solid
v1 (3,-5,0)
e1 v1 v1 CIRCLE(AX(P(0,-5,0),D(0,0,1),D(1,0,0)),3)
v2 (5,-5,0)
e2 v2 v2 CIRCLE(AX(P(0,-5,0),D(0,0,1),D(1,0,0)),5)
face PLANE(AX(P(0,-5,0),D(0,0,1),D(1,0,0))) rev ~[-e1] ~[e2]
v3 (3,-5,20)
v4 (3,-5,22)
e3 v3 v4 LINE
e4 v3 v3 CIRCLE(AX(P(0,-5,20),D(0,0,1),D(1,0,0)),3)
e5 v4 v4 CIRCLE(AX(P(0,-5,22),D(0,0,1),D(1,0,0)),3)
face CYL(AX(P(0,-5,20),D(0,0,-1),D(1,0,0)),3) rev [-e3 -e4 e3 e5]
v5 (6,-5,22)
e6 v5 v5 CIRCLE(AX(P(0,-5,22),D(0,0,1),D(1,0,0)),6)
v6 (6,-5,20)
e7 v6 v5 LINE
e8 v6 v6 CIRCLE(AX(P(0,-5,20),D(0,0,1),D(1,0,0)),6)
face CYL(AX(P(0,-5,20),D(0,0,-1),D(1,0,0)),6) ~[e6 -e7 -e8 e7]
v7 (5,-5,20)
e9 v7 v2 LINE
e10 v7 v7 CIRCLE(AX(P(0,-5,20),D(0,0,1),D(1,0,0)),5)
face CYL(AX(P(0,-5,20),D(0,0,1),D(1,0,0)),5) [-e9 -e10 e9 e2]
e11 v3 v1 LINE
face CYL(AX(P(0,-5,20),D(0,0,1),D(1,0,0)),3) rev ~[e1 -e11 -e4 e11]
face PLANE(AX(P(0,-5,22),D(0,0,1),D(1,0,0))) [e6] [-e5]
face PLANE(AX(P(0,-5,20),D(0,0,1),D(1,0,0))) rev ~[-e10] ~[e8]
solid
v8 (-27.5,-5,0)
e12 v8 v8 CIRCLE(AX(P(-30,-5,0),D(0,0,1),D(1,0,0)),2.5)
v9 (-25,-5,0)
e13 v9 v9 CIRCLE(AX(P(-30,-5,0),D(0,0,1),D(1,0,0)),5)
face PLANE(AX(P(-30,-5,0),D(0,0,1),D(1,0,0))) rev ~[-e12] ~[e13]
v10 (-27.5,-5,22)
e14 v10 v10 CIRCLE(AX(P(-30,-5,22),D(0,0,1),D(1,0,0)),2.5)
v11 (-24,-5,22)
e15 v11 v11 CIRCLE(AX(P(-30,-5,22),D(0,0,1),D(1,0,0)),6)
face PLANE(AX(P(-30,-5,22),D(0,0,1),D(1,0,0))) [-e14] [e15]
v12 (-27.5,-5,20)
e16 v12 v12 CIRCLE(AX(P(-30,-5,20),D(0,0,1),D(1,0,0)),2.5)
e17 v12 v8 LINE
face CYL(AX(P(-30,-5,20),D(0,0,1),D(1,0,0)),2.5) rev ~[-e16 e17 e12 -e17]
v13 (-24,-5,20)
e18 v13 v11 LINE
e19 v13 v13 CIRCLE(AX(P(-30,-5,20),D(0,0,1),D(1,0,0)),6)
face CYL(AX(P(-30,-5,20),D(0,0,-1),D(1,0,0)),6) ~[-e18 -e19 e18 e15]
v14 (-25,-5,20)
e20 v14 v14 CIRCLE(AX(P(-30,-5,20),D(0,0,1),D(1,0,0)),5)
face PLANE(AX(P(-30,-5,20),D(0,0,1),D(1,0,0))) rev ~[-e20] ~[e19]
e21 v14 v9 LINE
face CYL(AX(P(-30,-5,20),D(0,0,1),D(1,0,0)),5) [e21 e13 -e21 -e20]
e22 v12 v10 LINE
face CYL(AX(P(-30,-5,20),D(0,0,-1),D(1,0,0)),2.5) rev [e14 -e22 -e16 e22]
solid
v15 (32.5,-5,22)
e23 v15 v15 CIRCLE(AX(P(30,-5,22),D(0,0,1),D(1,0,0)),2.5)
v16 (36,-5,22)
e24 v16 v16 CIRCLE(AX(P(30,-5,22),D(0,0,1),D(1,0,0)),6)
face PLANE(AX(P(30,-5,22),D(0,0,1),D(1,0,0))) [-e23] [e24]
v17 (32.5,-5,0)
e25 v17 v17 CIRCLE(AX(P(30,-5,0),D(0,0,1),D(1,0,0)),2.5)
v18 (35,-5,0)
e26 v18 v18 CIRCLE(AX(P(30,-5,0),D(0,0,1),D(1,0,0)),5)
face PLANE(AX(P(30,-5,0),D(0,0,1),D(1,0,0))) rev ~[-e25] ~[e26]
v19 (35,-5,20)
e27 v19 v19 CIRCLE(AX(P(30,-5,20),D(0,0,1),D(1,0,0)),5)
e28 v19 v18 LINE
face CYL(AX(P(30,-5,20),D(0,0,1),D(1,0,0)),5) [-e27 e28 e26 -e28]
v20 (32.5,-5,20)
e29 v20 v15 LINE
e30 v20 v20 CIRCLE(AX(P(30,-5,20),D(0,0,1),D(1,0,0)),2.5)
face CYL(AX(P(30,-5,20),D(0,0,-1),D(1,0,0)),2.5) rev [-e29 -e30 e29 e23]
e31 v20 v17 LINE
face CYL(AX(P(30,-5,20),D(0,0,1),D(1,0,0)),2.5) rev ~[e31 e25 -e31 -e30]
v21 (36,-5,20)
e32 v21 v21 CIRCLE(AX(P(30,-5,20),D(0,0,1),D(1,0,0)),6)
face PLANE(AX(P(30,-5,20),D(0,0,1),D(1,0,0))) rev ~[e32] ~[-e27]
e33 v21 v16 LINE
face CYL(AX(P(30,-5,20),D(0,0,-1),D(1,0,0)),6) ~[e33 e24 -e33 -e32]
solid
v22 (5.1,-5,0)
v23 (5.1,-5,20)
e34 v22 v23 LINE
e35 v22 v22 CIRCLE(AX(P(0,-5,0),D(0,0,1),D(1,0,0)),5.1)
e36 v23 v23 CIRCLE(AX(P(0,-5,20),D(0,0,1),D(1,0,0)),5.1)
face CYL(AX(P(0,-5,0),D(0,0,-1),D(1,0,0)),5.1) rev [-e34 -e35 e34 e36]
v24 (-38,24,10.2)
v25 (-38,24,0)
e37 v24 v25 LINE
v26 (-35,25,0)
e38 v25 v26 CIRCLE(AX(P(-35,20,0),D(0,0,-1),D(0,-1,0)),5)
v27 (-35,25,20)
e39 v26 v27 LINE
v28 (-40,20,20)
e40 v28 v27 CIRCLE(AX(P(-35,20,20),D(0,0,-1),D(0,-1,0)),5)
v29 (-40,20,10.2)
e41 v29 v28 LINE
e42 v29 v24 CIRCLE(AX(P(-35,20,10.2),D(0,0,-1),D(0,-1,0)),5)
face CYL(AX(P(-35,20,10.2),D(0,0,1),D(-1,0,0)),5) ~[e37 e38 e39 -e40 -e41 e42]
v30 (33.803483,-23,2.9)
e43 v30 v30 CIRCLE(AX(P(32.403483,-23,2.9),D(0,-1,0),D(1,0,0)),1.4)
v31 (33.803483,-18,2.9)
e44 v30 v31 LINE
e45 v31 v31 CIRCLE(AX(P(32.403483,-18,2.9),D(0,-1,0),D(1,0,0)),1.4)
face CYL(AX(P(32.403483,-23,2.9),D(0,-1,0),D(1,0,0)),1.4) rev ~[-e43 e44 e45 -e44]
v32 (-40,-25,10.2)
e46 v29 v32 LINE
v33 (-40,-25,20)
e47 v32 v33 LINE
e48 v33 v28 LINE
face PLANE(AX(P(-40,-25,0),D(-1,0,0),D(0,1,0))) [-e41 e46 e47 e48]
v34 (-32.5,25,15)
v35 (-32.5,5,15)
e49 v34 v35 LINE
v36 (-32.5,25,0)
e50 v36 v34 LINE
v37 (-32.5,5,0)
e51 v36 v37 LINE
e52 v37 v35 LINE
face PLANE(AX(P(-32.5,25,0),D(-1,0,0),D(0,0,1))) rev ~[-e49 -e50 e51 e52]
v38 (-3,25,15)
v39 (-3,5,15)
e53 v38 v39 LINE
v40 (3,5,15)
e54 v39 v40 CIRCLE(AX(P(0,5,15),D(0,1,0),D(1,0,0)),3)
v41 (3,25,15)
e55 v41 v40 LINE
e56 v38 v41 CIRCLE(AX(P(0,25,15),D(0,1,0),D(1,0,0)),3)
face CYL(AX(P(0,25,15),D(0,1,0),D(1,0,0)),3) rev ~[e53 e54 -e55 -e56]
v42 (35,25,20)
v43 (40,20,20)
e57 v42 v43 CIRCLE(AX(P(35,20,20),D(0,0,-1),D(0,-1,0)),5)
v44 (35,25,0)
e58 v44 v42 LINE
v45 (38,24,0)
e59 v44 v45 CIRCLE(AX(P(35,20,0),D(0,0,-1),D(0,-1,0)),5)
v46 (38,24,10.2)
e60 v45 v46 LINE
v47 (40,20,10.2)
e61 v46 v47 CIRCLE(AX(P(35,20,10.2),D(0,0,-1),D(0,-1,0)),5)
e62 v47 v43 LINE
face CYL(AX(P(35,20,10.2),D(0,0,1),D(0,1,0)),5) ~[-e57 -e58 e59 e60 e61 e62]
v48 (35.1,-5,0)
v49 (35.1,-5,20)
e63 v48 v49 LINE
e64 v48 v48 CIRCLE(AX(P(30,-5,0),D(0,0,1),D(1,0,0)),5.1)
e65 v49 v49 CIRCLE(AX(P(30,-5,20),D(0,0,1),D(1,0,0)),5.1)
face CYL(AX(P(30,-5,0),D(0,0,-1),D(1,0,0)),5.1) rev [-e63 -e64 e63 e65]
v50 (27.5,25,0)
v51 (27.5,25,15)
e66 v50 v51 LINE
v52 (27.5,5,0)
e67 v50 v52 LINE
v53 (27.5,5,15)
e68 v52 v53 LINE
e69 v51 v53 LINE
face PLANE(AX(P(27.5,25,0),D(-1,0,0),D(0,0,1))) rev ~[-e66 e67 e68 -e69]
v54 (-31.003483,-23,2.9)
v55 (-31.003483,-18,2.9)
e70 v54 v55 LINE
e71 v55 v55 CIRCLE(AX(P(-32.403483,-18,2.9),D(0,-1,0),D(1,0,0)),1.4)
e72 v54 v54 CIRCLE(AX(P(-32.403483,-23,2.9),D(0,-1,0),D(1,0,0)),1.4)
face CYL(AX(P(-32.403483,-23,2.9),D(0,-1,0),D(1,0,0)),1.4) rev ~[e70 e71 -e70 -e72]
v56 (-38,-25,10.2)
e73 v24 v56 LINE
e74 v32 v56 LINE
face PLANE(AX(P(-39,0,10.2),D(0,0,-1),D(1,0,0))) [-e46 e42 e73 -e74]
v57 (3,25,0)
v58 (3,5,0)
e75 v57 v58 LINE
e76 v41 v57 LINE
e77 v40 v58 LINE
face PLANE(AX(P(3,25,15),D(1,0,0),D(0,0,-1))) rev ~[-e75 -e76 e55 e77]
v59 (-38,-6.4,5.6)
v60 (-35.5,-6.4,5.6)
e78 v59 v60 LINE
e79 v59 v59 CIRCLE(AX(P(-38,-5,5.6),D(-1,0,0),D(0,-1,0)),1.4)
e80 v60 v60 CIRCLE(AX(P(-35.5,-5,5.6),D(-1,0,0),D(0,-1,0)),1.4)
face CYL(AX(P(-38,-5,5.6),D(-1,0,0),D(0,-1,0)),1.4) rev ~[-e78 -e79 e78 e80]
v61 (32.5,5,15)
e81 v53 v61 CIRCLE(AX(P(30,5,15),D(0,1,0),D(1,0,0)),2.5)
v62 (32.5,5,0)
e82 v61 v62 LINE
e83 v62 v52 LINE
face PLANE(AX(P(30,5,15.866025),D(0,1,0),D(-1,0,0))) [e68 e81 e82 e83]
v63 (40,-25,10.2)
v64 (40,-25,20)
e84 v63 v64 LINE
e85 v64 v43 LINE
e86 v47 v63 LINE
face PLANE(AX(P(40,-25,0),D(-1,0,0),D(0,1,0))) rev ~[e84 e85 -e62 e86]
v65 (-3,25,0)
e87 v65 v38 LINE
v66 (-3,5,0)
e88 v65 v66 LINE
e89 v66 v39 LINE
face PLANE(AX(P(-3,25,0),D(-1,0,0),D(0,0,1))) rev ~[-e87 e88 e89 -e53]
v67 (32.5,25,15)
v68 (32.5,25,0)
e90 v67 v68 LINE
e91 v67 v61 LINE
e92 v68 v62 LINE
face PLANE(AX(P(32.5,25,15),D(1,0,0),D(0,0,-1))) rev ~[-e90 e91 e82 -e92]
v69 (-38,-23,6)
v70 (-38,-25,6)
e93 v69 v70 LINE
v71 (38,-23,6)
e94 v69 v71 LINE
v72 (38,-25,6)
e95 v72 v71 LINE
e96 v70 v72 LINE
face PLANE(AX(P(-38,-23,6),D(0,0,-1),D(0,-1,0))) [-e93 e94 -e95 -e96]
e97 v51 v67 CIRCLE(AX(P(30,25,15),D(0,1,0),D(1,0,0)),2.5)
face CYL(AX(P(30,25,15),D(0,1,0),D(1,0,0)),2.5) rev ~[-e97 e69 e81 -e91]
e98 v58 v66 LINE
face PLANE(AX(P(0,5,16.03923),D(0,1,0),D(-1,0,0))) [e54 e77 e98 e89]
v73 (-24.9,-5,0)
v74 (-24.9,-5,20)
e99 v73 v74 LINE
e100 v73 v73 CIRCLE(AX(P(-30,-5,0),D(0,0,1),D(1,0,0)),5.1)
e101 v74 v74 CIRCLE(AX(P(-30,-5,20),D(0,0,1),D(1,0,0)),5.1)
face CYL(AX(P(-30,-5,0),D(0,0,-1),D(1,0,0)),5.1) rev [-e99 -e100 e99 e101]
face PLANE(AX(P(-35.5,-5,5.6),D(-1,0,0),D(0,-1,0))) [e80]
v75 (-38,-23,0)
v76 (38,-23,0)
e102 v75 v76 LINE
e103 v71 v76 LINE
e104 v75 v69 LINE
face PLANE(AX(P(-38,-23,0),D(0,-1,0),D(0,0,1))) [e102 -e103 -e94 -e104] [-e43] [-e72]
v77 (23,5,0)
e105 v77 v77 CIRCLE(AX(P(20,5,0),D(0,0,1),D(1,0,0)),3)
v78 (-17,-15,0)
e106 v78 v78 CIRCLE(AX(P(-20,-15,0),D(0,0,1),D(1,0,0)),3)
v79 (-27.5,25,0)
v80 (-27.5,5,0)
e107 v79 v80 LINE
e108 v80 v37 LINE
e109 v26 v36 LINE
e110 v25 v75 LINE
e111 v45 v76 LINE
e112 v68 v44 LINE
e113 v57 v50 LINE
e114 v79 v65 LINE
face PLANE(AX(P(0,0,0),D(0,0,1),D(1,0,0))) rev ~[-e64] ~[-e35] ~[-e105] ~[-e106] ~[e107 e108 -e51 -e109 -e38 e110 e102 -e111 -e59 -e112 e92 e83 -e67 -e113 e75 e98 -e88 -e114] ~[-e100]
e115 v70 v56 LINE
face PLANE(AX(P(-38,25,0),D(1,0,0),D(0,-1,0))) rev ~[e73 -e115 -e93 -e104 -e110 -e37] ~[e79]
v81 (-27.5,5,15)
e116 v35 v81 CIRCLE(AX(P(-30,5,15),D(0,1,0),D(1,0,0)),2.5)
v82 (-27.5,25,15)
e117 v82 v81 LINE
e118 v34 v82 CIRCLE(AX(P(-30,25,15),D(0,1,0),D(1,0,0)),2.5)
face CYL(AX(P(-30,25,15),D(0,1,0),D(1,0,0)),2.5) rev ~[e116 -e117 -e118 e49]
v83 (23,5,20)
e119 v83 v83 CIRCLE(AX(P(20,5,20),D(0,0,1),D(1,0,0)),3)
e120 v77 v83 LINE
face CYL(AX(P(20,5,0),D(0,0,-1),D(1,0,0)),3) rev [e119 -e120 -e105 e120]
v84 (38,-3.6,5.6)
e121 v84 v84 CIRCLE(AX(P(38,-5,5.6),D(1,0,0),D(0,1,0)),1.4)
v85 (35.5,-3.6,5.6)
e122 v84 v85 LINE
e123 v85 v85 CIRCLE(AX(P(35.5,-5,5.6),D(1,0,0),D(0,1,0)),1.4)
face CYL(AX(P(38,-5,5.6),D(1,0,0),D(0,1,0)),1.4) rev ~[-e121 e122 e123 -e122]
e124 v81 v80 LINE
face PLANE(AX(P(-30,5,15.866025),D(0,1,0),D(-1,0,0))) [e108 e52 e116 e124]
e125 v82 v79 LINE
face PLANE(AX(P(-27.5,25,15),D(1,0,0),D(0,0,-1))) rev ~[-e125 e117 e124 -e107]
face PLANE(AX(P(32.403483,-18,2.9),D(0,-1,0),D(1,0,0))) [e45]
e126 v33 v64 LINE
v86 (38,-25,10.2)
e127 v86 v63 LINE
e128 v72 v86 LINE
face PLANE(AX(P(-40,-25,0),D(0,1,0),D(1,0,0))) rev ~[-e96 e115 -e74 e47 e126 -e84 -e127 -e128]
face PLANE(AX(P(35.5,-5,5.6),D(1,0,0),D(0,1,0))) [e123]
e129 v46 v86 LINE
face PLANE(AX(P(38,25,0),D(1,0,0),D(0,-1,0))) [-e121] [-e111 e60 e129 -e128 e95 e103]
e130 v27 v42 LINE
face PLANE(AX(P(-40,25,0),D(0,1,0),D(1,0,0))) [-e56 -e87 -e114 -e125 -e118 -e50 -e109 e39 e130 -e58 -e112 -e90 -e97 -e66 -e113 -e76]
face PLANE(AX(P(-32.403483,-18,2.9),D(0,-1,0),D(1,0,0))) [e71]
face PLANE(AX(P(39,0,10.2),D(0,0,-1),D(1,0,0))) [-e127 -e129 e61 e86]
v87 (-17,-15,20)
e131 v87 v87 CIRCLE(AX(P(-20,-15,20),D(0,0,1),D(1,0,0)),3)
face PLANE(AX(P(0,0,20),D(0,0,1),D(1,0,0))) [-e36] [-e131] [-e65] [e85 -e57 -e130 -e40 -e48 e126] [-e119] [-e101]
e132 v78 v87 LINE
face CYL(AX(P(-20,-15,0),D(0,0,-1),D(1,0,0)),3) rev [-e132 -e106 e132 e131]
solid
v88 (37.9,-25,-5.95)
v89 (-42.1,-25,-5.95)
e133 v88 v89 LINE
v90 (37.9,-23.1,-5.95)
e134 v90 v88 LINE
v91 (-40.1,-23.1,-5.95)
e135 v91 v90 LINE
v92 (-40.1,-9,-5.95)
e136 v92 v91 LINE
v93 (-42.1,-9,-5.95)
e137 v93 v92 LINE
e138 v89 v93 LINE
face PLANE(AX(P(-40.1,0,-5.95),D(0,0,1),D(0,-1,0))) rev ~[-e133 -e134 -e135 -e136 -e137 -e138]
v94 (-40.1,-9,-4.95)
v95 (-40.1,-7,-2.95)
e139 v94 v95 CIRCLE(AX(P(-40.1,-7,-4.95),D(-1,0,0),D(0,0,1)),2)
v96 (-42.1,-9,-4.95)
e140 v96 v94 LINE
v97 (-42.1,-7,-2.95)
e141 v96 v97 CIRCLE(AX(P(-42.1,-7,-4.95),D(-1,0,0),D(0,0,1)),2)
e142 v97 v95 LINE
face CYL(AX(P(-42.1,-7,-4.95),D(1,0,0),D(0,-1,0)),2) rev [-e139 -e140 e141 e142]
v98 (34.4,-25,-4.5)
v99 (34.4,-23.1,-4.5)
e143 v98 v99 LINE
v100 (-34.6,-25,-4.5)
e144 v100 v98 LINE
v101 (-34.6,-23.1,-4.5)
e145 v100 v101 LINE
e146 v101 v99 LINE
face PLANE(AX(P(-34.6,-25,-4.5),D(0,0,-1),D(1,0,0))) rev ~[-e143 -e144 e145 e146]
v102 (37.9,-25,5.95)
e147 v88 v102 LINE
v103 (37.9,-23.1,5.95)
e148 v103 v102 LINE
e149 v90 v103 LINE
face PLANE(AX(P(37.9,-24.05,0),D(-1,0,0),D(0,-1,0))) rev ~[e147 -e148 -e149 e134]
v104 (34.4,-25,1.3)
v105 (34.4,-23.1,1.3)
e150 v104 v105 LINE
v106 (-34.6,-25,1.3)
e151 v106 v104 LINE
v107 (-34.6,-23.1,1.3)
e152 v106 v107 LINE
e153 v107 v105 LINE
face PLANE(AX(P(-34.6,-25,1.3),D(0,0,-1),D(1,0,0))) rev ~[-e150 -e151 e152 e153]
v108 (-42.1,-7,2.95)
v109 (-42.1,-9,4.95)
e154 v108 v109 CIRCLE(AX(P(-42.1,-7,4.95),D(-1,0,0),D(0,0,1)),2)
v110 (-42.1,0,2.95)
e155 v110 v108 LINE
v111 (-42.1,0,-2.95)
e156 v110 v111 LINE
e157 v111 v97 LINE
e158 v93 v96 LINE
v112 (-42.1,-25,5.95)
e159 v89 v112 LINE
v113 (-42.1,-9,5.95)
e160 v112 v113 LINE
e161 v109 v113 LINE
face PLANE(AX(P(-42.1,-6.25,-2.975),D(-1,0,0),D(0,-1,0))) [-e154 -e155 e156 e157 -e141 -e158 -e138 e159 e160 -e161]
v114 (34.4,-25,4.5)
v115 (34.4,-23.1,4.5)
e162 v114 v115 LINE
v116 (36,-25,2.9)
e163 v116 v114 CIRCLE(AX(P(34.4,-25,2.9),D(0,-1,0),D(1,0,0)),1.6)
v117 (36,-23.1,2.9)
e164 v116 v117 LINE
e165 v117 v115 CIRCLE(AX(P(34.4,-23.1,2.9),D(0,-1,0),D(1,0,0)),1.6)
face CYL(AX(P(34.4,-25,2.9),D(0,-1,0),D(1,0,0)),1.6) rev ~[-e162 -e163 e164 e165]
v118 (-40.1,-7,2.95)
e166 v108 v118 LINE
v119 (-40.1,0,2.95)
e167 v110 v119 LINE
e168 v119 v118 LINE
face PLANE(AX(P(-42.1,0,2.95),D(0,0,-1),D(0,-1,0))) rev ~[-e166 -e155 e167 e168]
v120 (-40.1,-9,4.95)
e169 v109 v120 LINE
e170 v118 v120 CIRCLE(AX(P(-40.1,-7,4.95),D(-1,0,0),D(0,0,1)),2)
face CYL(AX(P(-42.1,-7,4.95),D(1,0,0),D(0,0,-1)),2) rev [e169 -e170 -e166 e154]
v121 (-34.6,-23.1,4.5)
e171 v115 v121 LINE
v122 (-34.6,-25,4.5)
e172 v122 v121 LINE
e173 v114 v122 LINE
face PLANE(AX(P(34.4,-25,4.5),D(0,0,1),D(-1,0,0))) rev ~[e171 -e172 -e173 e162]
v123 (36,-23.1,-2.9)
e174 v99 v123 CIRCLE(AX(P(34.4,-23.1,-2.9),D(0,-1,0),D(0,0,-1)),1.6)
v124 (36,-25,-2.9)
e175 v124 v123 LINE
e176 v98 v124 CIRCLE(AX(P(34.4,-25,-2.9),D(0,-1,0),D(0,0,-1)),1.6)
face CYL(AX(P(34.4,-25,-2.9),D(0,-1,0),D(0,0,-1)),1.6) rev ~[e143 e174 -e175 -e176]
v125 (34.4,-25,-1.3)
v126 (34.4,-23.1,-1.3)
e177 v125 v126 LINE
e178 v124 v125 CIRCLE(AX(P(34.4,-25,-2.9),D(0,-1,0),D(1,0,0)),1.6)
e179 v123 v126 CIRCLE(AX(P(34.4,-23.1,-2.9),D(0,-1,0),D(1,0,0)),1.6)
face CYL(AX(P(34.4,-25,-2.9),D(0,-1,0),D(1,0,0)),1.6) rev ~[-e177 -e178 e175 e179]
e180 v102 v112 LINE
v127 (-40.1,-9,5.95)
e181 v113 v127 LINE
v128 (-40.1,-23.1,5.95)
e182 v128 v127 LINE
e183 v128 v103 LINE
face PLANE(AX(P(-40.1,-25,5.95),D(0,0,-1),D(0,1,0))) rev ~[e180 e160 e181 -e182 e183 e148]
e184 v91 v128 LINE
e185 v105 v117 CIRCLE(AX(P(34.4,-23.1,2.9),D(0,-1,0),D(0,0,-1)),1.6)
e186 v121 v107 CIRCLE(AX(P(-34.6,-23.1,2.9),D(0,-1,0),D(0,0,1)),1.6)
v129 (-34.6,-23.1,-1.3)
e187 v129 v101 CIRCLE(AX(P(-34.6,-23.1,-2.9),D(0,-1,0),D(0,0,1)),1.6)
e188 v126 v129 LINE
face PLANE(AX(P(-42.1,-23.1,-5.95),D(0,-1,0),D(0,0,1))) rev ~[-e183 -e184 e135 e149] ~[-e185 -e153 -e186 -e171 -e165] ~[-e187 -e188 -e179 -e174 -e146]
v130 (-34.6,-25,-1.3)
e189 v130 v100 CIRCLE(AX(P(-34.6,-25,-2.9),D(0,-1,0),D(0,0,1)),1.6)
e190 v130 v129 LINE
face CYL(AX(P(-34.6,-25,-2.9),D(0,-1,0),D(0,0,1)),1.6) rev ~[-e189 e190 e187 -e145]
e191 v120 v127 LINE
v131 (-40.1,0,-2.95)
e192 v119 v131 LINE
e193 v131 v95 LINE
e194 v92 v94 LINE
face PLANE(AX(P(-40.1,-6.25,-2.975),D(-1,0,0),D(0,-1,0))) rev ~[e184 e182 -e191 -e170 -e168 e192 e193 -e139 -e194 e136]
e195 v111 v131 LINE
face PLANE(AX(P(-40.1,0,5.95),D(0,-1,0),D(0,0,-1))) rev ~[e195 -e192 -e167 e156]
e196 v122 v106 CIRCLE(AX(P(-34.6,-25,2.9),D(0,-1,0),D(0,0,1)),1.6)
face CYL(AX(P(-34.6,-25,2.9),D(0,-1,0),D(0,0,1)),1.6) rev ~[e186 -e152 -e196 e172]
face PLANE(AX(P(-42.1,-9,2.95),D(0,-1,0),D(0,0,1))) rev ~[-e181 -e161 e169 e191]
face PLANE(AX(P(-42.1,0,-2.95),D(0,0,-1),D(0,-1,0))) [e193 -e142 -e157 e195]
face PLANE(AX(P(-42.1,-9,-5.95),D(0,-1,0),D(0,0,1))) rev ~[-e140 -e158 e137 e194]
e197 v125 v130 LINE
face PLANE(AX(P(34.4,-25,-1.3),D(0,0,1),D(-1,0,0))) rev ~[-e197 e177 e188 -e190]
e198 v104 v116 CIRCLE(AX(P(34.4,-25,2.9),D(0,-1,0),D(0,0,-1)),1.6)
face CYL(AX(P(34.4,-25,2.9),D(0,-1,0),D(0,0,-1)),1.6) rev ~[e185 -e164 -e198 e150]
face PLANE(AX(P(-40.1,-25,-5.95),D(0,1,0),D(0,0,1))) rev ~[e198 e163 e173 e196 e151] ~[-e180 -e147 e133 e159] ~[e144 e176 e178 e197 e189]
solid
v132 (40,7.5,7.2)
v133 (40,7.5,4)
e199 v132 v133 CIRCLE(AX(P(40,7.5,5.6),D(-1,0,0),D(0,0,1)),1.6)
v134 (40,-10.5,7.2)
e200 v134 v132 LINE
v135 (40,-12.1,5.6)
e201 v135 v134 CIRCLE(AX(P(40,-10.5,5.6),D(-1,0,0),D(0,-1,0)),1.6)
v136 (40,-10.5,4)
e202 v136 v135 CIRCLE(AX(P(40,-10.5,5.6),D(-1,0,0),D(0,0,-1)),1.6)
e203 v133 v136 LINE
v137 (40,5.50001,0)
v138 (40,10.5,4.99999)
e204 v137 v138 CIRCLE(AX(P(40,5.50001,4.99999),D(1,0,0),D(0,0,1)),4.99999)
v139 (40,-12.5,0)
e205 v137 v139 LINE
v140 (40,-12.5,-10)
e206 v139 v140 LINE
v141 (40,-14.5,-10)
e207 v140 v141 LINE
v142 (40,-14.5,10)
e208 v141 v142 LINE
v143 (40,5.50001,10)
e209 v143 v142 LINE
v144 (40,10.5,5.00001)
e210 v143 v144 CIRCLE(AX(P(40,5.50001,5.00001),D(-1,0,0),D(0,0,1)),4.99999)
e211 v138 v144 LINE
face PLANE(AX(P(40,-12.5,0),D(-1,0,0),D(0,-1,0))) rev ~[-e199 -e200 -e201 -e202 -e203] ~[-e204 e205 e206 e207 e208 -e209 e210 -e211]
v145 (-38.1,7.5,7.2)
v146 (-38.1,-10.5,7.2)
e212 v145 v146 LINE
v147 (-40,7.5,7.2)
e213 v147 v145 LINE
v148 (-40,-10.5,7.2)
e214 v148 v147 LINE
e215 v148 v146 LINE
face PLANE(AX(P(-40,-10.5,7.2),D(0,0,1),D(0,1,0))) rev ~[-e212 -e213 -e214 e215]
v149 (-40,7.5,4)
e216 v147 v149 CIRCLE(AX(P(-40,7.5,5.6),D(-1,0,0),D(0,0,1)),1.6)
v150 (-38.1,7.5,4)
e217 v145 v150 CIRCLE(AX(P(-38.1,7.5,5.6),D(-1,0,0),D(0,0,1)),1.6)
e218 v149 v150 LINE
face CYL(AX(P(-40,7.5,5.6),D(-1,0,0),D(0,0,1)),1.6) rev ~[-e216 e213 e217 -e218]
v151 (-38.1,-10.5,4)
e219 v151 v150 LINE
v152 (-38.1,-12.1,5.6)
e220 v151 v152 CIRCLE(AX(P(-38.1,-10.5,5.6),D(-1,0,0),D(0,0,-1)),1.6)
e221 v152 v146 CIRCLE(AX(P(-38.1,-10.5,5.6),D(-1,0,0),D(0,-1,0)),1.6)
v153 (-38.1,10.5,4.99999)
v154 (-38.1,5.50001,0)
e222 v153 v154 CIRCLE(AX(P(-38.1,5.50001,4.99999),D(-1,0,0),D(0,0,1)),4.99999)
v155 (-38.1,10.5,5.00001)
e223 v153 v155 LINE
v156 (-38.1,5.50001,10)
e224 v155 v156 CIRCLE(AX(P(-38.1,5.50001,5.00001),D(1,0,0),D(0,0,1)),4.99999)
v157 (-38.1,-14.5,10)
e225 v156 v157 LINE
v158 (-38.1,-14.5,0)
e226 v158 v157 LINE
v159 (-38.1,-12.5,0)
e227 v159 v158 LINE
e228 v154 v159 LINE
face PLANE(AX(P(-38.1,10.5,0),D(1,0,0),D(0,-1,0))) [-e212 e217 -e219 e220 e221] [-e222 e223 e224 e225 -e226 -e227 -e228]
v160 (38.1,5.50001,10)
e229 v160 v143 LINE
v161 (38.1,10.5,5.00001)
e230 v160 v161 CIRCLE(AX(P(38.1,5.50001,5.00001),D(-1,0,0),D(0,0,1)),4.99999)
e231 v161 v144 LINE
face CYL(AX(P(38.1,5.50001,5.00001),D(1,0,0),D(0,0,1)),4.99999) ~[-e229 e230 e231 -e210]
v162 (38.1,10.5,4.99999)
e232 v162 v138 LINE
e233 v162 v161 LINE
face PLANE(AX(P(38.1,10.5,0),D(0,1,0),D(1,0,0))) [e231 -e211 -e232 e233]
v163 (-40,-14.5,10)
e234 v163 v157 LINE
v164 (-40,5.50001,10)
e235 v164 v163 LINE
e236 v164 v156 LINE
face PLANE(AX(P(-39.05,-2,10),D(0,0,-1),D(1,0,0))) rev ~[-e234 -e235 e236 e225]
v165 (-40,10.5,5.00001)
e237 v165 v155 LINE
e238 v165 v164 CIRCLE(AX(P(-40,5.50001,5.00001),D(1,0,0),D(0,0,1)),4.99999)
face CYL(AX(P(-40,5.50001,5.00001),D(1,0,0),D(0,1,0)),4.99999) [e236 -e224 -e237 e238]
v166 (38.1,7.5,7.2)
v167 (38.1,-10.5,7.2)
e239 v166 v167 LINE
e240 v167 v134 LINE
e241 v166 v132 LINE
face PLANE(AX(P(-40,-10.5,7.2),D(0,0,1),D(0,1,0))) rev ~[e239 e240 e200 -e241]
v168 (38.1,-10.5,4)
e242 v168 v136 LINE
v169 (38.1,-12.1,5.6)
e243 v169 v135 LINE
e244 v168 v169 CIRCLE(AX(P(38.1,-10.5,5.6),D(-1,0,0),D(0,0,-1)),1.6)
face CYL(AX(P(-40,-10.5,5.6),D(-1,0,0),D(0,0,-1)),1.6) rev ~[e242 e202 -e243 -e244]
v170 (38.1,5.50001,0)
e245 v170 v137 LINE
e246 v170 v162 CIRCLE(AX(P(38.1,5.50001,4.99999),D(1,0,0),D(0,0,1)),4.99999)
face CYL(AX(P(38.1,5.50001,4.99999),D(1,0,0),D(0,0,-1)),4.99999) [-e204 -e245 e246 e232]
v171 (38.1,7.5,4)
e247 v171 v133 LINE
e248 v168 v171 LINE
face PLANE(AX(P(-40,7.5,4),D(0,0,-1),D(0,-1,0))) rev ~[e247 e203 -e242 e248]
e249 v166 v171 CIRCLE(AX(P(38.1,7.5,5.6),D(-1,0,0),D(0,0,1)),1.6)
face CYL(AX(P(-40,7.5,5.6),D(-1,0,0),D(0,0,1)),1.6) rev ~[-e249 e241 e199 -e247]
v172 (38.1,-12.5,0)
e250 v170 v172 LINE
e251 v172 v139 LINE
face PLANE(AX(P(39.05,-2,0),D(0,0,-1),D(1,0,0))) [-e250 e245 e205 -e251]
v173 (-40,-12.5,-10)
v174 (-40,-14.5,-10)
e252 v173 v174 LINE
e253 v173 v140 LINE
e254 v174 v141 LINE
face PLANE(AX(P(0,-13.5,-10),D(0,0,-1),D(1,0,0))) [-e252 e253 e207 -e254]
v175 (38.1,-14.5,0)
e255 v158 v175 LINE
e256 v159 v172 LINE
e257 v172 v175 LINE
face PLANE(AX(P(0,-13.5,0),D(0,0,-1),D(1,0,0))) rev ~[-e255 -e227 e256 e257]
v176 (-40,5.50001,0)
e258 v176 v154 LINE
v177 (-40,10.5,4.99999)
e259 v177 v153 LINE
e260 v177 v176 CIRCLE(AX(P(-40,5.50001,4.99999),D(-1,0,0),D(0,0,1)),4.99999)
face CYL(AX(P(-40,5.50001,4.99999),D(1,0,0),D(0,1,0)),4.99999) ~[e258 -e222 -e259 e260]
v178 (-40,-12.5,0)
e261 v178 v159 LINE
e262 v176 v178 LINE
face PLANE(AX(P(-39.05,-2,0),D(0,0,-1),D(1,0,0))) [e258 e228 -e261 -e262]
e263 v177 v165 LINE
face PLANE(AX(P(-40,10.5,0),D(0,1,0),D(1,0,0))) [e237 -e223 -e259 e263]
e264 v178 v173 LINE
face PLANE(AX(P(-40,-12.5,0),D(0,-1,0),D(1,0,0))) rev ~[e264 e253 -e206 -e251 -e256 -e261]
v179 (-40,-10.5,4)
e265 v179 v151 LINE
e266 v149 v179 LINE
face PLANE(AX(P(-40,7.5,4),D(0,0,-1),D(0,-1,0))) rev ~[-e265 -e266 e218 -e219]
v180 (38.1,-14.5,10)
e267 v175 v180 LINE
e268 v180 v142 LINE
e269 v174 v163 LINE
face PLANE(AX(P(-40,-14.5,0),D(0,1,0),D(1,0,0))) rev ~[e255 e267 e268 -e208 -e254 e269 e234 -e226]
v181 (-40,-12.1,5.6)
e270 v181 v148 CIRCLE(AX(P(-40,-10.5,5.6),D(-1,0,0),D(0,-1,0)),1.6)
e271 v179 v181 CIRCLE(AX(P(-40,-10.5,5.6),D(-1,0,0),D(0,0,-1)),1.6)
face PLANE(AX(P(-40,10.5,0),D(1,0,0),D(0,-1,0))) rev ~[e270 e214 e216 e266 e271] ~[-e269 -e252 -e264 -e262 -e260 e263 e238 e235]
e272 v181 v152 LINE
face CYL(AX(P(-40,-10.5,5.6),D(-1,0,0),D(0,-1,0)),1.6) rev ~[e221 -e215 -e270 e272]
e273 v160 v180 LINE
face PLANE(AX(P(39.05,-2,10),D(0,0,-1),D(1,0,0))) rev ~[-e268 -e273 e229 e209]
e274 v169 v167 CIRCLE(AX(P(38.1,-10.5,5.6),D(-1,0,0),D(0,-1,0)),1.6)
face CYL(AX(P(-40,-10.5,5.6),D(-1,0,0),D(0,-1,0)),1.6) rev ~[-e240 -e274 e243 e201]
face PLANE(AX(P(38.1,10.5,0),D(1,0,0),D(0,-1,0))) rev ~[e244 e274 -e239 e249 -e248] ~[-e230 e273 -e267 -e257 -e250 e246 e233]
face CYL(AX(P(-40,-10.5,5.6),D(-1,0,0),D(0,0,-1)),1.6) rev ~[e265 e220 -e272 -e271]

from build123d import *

# Parameters (mm, degrees)
F0_W          = 80
F0_H          = 50
F0_R          = 3
F0_R_2        = 5.1
F1_DEPTH      = 20
F3_DEPTH      = 20
F4_R          = 5
F4_R_2        = 2.5
F5_DEPTH      = 20
F5_DEPTH_BACK = 2
F4_R_3        = 3
F6_R          = 6
F6_R_2        = 5.1
F6_R_3        = 4.2549241369
F7_DEPTH      = 2
F6_R_4        = 3.9454924111
F6_R_5        = 4.3855625848
F8_W          = 80
F8_H          = 2
F9_DEPTH      = 10
F10_W         = 2
F10_H         = 50
F11_DEPTH     = 10.2
F12_W         = 1.9
F12_H         = 25
F13_DEPTH     = 10
F15_DEPTH     = 90
F16_R         = 4.99999
F17_R         = 1.4
F18_R         = 1.4
F19_DEPTH     = 2.5
F20_R         = 5
F21_W         = 2
F21_H         = 6
F22_DEPTH     = 80
F24_START     = 0.1
F23_W         = 12.5
F23_H         = 5.95
F23_W_2       = 10.5
F23_H_2       = 11.9
F24_DEPTH     = 2
F25_W         = 1.9
F25_H         = 11.9
F26_DEPTH     = 80
F27_W         = 9
F27_H         = 3
F28_DEPTH     = 25
F29_R         = 2
F31_DEPTH     = 25
F32_R         = 1.4
F33_DEPTH     = 5


# Not quite as in the source:
# - a fillet or chamfer is up to 0.001 mm smaller than in the source, because OpenCascade refuses the exact size
# - a feature names something its author has since deleted; it is built from what else it names


with BuildPart() as f1:
    # F0 (on Top) → F1 (new body)
    with BuildSketch(Plane.XY):
        Rectangle(F0_W, F0_H)
        with Locations((-20, -15)):
            Circle(F0_R, mode=Mode.SUBTRACT)
        with Locations((-30, -5)):
            Circle(F0_R_2, mode=Mode.SUBTRACT)
        with Locations((0, -5)):
            Circle(F0_R_2, mode=Mode.SUBTRACT)
        with Locations((30, -5)):
            Circle(F0_R_2, mode=Mode.SUBTRACT)
        with Locations((20, 5)):
            Circle(F0_R, mode=Mode.SUBTRACT)
    extrude(amount=F1_DEPTH)

    # F2 (on face) → F3 (cut)
    with BuildSketch(Plane(origin=(0, 25, 0), x_dir=(-1, 0, 0), z_dir=(0, 1, 0))):
        with BuildLine():
            Line((-3, 15), (3, 15))
            ThreePointArc((3, 15), (0, 18), (-3, 15))
        make_face()
        with BuildLine():
            ThreePointArc((-3, 15), (0, 12), (3, 15))
            Line((3, 15), (-3, 15))
        make_face()
        with BuildLine():
            Line((-32.5, 15), (-27.5, 15))
            ThreePointArc((-27.5, 15), (-30, 17.5), (-32.5, 15))
        make_face()
        with BuildLine():
            ThreePointArc((-32.5, 15), (-30, 12.5), (-27.5, 15))
            Line((-27.5, 15), (-32.5, 15))
        make_face()
        with BuildLine():
            ThreePointArc((32.5, 15), (30, 17.5), (27.5, 15))
            Line((27.5, 15), (32.5, 15))
        make_face()
        with BuildLine():
            Line((32.5, 15), (27.5, 15))
            ThreePointArc((27.5, 15), (30, 12.5), (32.5, 15))
        make_face()
        with BuildLine():
            Line((-3, 0), (3, 0))
            Line((3, 0), (3, 15))
            ThreePointArc((3, 15), (0, 12), (-3, 15))
            Line((-3, 15), (-3, 0))
        make_face()
        with BuildLine():
            Line((-32.5, 0), (-27.5, 0))
            Line((-27.5, 0), (-27.5, 15))
            ThreePointArc((-27.5, 15), (-30, 12.5), (-32.5, 15))
            Line((-32.5, 15), (-32.5, 0))
        make_face()
        with BuildLine():
            Line((27.5, 15), (27.5, 0))
            Line((27.5, 0), (32.5, 0))
            Line((32.5, 0), (32.5, 15))
            ThreePointArc((32.5, 15), (30, 12.5), (27.5, 15))
        make_face()
    extrude(amount=-F3_DEPTH, mode=Mode.SUBTRACT)

    # F10 (on face) → F11 (cut)
    with BuildSketch(Plane(origin=(0, 0, 0), x_dir=(1, 0, 0), z_dir=(0, 0, -1))):
        with Locations((-39, 0)):
            Rectangle(F10_W, F10_H)
        with Locations((39, 0)):
            Rectangle(F10_W, F10_H)
    extrude(amount=-F11_DEPTH, mode=Mode.SUBTRACT)

    # F17 (on face) + F18 (on face) → F19 (cut, symmetric)
    with BuildSketch(Plane(origin=(-38, 0, 0), x_dir=(0, -1, 0), z_dir=(-1, 0, 0))):
        with Locations((5, 5.6)):
            Circle(F17_R)
    with BuildSketch(Plane.YZ.offset(38)):
        with Locations((-5, 5.6)):
            Circle(F18_R)
    extrude(amount=F19_DEPTH, both=True, dir=(-1, 0, 0), mode=Mode.SUBTRACT)

    # F20
    f20_edges = [f1.edges().sort_by_distance(p)[0] for p in [
        (-40, 25, 15.1),
        (40, 25, 15.1),
    ]]
    fillet(f20_edges, radius=F20_R)

    # F21 (on face) → F22 (cut)
    with BuildSketch(Plane(origin=(-38, 0, 0), x_dir=(0, -1, 0), z_dir=(-1, 0, 0))):
        with Locations((24, 3)):
            Rectangle(F21_W, F21_H)
    extrude(amount=-F22_DEPTH, mode=Mode.SUBTRACT)

    # F32 (on face) → F33 (cut)
    with BuildSketch(Plane.XZ.offset(23)):
        with Locations((-32.4034833738, 2.9)):
            Circle(F32_R)
        with Locations((32.4034833738, 2.9)):
            Circle(F32_R)
    extrude(amount=-F33_DEPTH, mode=Mode.SUBTRACT)


with BuildPart() as f5:
    # F4 (on face) → F5 (new body, two sides)
    with BuildSketch(Plane.XY.offset(20)) as f5_sk:
        with Locations((30, -5)):
            Circle(F4_R)
        with Locations((30, -5)):
            Circle(F4_R_2, mode=Mode.SUBTRACT)
    extrude(amount=-F5_DEPTH)
    extrude(f5_sk.sketch, amount=F5_DEPTH_BACK)

    # F6 (on face) → F7, piece 3 (join)
    with BuildSketch(Plane.XY.offset(20)):
        with Locations((30, -5)):
            Circle(F6_R)
        with Locations((30, -5)):
            Circle(F6_R_2, mode=Mode.SUBTRACT)
        with Locations((30, -5)):
            Circle(F6_R_2)
        with Locations((30, -5)):
            Circle(F6_R_5, mode=Mode.SUBTRACT)
    extrude(amount=F7_DEPTH)


with BuildPart() as f5b:
    # F4 (on face) → F5, piece 2 (new body, two sides)
    with BuildSketch(Plane.XY.offset(20)) as f5_2_sk:
        with Locations((0, -5)):
            Circle(F4_R)
        with Locations((0, -5)):
            Circle(F4_R_3, mode=Mode.SUBTRACT)
    extrude(amount=-F5_DEPTH)
    extrude(f5_2_sk.sketch, amount=F5_DEPTH_BACK)

    # F6 (on face) → F7 (join)
    with BuildSketch(Plane.XY.offset(20)):
        with Locations((0, -5)):
            Circle(F6_R)
        with Locations((0, -5)):
            Circle(F6_R_2, mode=Mode.SUBTRACT)
        with Locations((0, -5)):
            Circle(F6_R_2)
        with Locations((0, -5)):
            Circle(F6_R_3, mode=Mode.SUBTRACT)
    extrude(amount=F7_DEPTH)


with BuildPart() as f5c:
    # F4 (on face) → F5, piece 3 (new body, two sides)
    with BuildSketch(Plane.XY.offset(20)) as f5_3_sk:
        with Locations((-30, -5)):
            Circle(F4_R)
        with Locations((-30, -5)):
            Circle(F4_R_2, mode=Mode.SUBTRACT)
    extrude(amount=-F5_DEPTH)
    extrude(f5_3_sk.sketch, amount=F5_DEPTH_BACK)

    # F6 (on face) → F7, piece 2 (join)
    with BuildSketch(Plane.XY.offset(20)):
        with Locations((-30, -5)):
            Circle(F6_R)
        with Locations((-30, -5)):
            Circle(F6_R_2, mode=Mode.SUBTRACT)
        with Locations((-30, -5)):
            Circle(F6_R_2)
        with Locations((-30, -5)):
            Circle(F6_R_4, mode=Mode.SUBTRACT)
    extrude(amount=F7_DEPTH)


with BuildPart() as f9:
    # F8 (on face) → F9 (new body)
    with BuildSketch(Plane(origin=(0, 0, 0), x_dir=(1, 0, 0), z_dir=(0, 0, -1))):
        with Locations((0, 13.5)):
            Rectangle(F8_W, F8_H)
    extrude(amount=F9_DEPTH)

    # F12 (on face) → F13 (join)
    with BuildSketch(Plane(origin=(0, 0, 0), x_dir=(1, 0, 0), z_dir=(0, 0, -1))):
        with Locations((-39.05, 2)):
            Rectangle(F12_W, F12_H)
        with Locations((39.05, 2)):
            Rectangle(F12_W, F12_H)
    extrude(amount=-F13_DEPTH)

    # F14 (on face) → F15 (cut)
    with BuildSketch(Plane(origin=(-40, 0, 0), x_dir=(0, -1, 0), z_dir=(-1, 0, 0))):
        with BuildLine():
            ThreePointArc((-5.9, 5.6), (-6.3686291501, 6.7313708499), (-7.5, 7.2))
            Line((-7.5, 7.2), (-7.5, 4))
            ThreePointArc((-7.5, 4), (-6.3686291501, 4.4686291501), (-5.9, 5.6))
        make_face()
        with BuildLine():
            Line((10.5, 7.2), (-7.5, 7.2))
            ThreePointArc((-7.5, 7.2), (-6.3686291501, 6.7313708499), (-5.9, 5.6))
            ThreePointArc((-5.9, 5.6), (-6.3686291501, 4.4686291501), (-7.5, 4))
            Line((-7.5, 4), (10.5, 4))
            ThreePointArc((10.5, 4), (8.9, 5.6), (10.5, 7.2))
        make_face()
        with BuildLine():
            Line((-7.5, 4), (-7.5, 7.2))
            ThreePointArc((-7.5, 7.2), (-9.1, 5.6), (-7.5, 4))
        make_face()
        with BuildLine():
            ThreePointArc((12.1, 5.6), (11.6313708499, 6.7313708499), (10.5, 7.2))
            Line((10.5, 7.2), (10.5, 4))
            ThreePointArc((10.5, 4), (11.6313708499, 4.4686291501), (12.1, 5.6))
        make_face()
        with BuildLine():
            Line((10.5, 4), (10.5, 7.2))
            ThreePointArc((10.5, 7.2), (8.9, 5.6), (10.5, 4))
        make_face()
    extrude(amount=-F15_DEPTH, mode=Mode.SUBTRACT)

    # F16 (radius 5 in the source; OpenCascade refuses exactly that, so slightly less here)
    f16_edges = [f9.edges().sort_by_distance(p)[0] for p in [
        (-39.05, 10.5, 10),
        (-39.05, 10.5, 0),
        (39.05, 10.5, 10),
        (39.05, 10.5, 0),
    ]]
    fillet(f16_edges, radius=F16_R)


with BuildPart() as f24:
    # F23 (on face) → F24 (new body)
    with BuildSketch(Plane(origin=(-40, 0, 0), x_dir=(0, -1, 0), z_dir=(-1, 0, 0)).offset(F24_START)):
        with Locations((6.25, -2.975)):
            Rectangle(F23_W, F23_H)
        with Locations((19.75, 0)):
            Rectangle(F23_W_2, F23_H_2)
        with BuildLine():
            Line((12.5, -5.95), (14.5, -5.95))
            Line((14.5, -5.95), (14.5, 5.95))
            Line((14.5, 5.95), (12.0612494996, 5.95))
            ThreePointArc((12.0612494996, 5.95), (11.7489995997, 4.6), (10.5, 4))
            Line((10.5, 4), (0, 4))
            Line((0, 4), (0, 0))
            Line((0, 0), (12.5, 0))
            Line((12.5, 0), (12.5, -5.95))
        make_face()
        with BuildLine():
            ThreePointArc((10.5, 4), (11.7489995997, 4.6), (12.0612494996, 5.95))
            Line((12.0612494996, 5.95), (0, 5.95))
            Line((0, 5.95), (0, 4))
            Line((0, 4), (10.5, 4))
        make_face()
    extrude(amount=F24_DEPTH)

    # F25 (on face) → F26 (join)
    with BuildSketch(Plane(origin=(-42.1, 0, 0), x_dir=(0, -1, 0), z_dir=(-1, 0, 0))):
        with Locations((24.05, 0)):
            Rectangle(F25_W, F25_H)
    extrude(amount=-F26_DEPTH)

    # F27 (on face) → F28 (cut)
    with BuildSketch(Plane(origin=(-42.1, 0, 0), x_dir=(0, -1, 0), z_dir=(-1, 0, 0))):
        with Locations((4.5, 4.45)):
            Rectangle(F27_W, F27_H)
        with Locations((4.5, -4.45)):
            Rectangle(F27_W, F27_H)
    extrude(amount=-F28_DEPTH, mode=Mode.SUBTRACT)

    # F29
    f29_edges = [f24.edges().sort_by_distance(p)[0] for p in [
        (-41.1, -9, 2.95),
        (-41.1, -9, -2.95),
    ]]
    fillet(f29_edges, radius=F29_R)

    # F30 (on face) → F31 (cut)
    with BuildSketch(Plane.XZ.offset(25)):
        with BuildLine():
            Line((34.4, 4.5), (-34.6, 4.5))
            ThreePointArc((-34.6, 4.5), (-33.4686291501, 4.0313708499), (-33, 2.9))
            ThreePointArc((-33, 2.9), (-33.4686291501, 1.7686291501), (-34.6, 1.3))
            Line((-34.6, 1.3), (34.4, 1.3))
            ThreePointArc((34.4, 1.3), (32.8, 2.9), (34.4, 4.5))
        make_face()
        with BuildLine():
            ThreePointArc((-33, 2.9), (-33.4686291501, 4.0313708499), (-34.6, 4.5))
            Line((-34.6, 4.5), (-34.6, 1.3))
            ThreePointArc((-34.6, 1.3), (-33.4686291501, 1.7686291501), (-33, 2.9))
        make_face()
        with BuildLine():
            Line((-34.6, 1.3), (-34.6, 4.5))
            ThreePointArc((-34.6, 4.5), (-36.2, 2.9), (-34.6, 1.3))
        make_face()
        with BuildLine():
            ThreePointArc((-33, -2.9), (-33.4686291501, -1.7686291501), (-34.6, -1.3))
            ThreePointArc((-34.6, -1.3), (-36.2, -2.9), (-34.6, -4.5))
            ThreePointArc((-34.6, -4.5), (-33.4686291501, -4.0313708499), (-33, -2.9))
        make_face()
        with BuildLine():
            Line((34.4, -1.3), (-34.6, -1.3))
            ThreePointArc((-34.6, -1.3), (-33.4686291501, -1.7686291501), (-33, -2.9))
            ThreePointArc((-33, -2.9), (-33.4686291501, -4.0313708499), (-34.6, -4.5))
            Line((-34.6, -4.5), (34.4, -4.5))
            ThreePointArc((34.4, -4.5), (32.8, -2.9), (34.4, -1.3))
        make_face()
        with BuildLine():
            ThreePointArc((36, -2.9), (35.5313708499, -1.7686291501), (34.4, -1.3))
            ThreePointArc((34.4, -1.3), (32.8, -2.9), (34.4, -4.5))
            ThreePointArc((34.4, -4.5), (35.5313708499, -4.0313708499), (36, -2.9))
        make_face()
        with BuildLine():
            ThreePointArc((36, 2.9), (35.5313708499, 4.0313708499), (34.4, 4.5))
            Line((34.4, 4.5), (34.4, 1.3))
            ThreePointArc((34.4, 1.3), (35.5313708499, 1.7686291501), (36, 2.9))
        make_face()
        with BuildLine():
            Line((34.4, 1.3), (34.4, 4.5))
            ThreePointArc((34.4, 4.5), (32.8, 2.9), (34.4, 1.3))
        make_face()
    extrude(amount=-F31_DEPTH, mode=Mode.SUBTRACT)


solid = Compound([f1.part, f5.part, f5b.part, f5c.part, f9.part, f24.part])
